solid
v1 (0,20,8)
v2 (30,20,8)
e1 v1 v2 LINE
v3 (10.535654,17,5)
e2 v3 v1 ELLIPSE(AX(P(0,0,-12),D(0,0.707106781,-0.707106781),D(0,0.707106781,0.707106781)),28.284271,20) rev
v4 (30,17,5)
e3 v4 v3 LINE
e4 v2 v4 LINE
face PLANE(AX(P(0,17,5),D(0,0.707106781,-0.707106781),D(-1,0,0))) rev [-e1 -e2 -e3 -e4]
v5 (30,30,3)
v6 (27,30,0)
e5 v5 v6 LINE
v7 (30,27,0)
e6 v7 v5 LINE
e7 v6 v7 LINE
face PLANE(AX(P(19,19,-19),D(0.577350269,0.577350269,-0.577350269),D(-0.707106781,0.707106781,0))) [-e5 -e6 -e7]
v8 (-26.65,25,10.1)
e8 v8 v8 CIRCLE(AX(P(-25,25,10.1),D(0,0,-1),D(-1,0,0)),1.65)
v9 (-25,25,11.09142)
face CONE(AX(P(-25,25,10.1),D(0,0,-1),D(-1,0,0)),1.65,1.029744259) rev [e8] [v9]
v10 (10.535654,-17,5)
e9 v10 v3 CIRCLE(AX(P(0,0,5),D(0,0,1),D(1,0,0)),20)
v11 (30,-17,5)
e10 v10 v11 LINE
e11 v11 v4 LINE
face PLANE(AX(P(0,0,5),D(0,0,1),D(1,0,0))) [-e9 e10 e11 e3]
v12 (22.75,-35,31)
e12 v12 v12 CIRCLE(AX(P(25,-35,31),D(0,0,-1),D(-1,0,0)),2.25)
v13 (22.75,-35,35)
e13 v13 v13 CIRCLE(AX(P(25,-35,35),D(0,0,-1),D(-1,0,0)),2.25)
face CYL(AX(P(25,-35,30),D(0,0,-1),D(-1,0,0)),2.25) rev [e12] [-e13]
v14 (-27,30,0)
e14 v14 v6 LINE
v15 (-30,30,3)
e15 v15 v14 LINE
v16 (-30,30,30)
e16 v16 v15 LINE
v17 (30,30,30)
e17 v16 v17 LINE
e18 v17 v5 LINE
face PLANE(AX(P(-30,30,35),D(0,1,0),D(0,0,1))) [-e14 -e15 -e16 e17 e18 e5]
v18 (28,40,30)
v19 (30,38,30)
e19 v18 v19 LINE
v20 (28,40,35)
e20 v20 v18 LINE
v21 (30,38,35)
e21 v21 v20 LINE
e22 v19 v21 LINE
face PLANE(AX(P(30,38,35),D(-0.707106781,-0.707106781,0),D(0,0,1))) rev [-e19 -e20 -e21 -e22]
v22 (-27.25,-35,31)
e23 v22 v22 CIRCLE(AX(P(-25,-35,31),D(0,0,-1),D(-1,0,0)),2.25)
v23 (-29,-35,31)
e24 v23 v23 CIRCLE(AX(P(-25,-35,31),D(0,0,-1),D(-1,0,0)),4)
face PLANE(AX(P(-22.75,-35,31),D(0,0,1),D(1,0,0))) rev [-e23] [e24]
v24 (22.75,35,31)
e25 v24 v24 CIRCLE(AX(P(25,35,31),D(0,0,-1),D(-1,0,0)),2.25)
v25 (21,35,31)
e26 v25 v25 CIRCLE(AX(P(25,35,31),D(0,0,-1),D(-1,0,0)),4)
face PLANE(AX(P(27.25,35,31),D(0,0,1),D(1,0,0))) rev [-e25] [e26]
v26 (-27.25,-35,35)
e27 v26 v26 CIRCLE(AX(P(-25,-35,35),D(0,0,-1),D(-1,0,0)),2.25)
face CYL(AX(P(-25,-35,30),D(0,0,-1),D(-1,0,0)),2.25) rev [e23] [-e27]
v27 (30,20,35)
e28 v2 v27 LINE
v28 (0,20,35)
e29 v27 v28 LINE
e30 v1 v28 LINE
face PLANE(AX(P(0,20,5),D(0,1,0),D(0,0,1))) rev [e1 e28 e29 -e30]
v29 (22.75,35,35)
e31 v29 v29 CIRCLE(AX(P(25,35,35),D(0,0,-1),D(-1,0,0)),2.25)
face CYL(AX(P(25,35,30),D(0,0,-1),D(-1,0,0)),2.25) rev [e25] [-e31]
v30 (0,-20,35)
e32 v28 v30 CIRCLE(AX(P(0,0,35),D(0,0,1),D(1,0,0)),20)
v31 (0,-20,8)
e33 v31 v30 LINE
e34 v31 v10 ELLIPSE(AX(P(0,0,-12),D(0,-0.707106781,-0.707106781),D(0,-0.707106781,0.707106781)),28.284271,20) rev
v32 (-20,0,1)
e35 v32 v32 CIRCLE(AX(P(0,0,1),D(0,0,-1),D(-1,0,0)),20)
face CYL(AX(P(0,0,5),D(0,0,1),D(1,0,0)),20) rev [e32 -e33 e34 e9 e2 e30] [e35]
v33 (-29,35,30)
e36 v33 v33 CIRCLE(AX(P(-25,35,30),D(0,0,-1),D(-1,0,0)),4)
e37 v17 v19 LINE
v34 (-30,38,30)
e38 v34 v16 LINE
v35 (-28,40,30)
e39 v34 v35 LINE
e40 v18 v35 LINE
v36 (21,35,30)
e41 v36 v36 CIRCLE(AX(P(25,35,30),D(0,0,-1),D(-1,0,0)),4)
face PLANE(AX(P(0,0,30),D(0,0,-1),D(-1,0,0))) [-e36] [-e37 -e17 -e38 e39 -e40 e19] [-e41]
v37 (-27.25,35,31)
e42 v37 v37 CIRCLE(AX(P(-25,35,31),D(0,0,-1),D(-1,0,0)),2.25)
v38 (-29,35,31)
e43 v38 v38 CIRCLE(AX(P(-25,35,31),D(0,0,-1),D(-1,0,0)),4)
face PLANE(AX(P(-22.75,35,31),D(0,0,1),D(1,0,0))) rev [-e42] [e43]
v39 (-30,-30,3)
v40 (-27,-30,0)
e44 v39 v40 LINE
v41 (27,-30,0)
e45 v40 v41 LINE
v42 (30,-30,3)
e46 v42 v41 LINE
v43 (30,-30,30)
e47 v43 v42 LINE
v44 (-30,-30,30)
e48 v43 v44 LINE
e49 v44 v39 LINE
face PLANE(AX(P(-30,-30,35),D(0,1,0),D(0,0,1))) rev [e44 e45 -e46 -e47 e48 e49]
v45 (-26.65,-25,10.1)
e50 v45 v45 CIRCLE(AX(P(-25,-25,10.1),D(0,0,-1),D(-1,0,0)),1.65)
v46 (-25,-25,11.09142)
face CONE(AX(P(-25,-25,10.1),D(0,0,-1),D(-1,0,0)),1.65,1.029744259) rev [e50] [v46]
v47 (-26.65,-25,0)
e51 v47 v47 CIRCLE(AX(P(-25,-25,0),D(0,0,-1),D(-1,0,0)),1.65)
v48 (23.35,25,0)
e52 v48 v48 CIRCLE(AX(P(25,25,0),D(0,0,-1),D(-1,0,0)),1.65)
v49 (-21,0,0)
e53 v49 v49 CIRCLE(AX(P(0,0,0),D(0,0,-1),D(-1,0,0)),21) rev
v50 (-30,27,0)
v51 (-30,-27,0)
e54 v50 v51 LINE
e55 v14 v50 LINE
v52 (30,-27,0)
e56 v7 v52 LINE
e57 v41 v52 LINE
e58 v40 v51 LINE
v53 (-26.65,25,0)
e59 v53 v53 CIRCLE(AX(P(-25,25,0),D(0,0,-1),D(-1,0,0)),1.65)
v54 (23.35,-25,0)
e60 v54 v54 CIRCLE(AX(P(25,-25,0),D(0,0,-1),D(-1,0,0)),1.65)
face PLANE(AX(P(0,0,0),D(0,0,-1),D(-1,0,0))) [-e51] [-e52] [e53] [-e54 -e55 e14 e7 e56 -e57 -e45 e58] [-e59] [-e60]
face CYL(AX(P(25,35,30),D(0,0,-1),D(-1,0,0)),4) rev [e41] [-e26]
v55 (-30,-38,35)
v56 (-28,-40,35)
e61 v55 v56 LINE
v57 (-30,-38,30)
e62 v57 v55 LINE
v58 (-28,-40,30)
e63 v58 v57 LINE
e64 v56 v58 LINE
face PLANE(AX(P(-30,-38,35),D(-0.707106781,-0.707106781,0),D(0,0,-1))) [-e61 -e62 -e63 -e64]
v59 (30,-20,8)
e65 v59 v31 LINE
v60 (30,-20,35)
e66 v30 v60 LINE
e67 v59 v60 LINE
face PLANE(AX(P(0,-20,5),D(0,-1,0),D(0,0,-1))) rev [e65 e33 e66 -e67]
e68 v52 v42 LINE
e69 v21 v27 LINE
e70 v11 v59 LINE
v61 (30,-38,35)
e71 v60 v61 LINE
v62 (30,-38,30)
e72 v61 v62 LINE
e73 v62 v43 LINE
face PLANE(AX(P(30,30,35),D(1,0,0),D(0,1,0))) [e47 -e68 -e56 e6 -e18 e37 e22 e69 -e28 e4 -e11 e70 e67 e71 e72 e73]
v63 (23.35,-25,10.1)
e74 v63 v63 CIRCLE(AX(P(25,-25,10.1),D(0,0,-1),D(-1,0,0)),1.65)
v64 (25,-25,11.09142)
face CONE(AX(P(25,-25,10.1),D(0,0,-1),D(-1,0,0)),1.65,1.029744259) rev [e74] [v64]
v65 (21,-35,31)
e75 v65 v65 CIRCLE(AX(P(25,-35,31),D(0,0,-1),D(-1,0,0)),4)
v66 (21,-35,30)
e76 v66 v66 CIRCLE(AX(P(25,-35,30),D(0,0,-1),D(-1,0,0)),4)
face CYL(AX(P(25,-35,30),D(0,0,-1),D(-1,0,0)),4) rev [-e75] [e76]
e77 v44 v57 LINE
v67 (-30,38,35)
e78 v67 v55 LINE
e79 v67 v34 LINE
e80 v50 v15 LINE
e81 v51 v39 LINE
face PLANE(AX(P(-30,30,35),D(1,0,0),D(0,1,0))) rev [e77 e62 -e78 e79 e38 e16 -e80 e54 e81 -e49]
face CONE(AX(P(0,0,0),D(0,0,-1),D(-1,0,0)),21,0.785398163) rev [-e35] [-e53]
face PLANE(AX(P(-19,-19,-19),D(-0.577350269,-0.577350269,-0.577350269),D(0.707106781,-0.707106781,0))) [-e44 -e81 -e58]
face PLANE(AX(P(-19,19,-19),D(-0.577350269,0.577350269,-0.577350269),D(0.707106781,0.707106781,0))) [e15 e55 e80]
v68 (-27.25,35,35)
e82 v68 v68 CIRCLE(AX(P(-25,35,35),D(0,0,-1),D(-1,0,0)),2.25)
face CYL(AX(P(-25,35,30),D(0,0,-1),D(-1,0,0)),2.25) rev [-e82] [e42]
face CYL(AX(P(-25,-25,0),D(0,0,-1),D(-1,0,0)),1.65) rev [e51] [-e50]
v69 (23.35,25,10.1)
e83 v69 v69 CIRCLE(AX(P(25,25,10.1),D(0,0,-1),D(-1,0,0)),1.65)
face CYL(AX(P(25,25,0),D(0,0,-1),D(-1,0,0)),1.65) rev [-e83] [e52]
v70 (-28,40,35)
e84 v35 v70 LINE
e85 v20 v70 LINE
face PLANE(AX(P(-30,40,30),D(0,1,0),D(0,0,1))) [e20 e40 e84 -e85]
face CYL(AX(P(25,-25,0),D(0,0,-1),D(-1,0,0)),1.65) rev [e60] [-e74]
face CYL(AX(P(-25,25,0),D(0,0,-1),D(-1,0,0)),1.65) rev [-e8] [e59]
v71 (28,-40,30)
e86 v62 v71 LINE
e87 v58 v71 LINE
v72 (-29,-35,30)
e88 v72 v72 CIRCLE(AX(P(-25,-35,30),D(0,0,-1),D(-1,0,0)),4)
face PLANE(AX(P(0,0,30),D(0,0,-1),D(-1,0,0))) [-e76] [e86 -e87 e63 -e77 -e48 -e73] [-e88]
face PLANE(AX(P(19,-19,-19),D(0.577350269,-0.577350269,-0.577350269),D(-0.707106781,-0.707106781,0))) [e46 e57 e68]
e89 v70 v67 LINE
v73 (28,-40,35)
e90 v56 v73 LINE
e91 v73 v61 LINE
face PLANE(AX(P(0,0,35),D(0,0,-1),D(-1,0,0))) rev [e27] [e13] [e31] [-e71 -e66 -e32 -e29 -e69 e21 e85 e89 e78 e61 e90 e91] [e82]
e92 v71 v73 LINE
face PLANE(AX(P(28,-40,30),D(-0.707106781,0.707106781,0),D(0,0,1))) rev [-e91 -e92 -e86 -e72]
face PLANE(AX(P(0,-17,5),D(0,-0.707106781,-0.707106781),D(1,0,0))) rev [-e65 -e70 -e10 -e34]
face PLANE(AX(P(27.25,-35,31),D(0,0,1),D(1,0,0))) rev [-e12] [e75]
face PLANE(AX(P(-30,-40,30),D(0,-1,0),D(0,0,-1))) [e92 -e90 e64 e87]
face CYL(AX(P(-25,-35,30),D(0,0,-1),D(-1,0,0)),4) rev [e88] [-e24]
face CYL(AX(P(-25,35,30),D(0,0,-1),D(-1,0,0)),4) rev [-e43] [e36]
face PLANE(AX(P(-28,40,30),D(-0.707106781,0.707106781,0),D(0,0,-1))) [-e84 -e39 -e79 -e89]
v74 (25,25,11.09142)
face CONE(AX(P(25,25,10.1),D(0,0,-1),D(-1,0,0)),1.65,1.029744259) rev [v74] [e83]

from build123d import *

# Parameters (mm, degrees)
BOSS_EXTRUDE1_DEPTH                                  = 35
CUT_EXTRUDE1_DEPTH                                   = 30
SKETCH3_R                                            = 20.000000000000007
CUT_EXTRUDE2_DEPTH                                   = 52.96152422706633
M4_TAPPED_HOLE1_D                                    = 3.3
M4_TAPPED_HOLE1_DEPTH                                = 10.1
M4_TAPPED_HOLE1_TIP                                  = 0.9914200213954745
BOSS_EXTRUDE2_DEPTH                                  = 5
CBORE_FOR_M4_HEXAGON_SOCKET_HEAD_CAP_SCR_D           = 4.5
CBORE_FOR_M4_HEXAGON_SOCKET_HEAD_CAP_SCR_CBORE_D     = 8
CBORE_FOR_M4_HEXAGON_SOCKET_HEAD_CAP_SCR_CBORE_DEPTH = 1
CHAMFER1_SIZE                                        = 2
CHAMFER2_START                                       = 32.908965344
CHAMFER2_OUTLINE_W                                   = 7.000000000000002
CHAMFER2_OUTLINE_H                                   = 7.0000000000000036
CHAMFER2_DEPTH                                       = 3.091034656
MIRROR1_START                                        = 32.908965344
MIRROR1_AT_THE_SECOND_PLANE_COPY_1_SKETC_W           = 7.000000000000002
MIRROR1_AT_THE_SECOND_PLANE_COPY_1_SKETC_H           = 7.0000000000000036
MIRROR1_AT_THE_SECOND_PLANE_COPY_1_DEPTH             = 3.091034656
CHAMFER3_SIZE                                        = 1
CHAMFER4_SIZE                                        = 3


with BuildPart() as part:
    # Sketch1 → Boss-Extrude1 (new body)
    with BuildSketch(Plane.XY):
        Polygon((-29.999999999999993, 30), (30, 30), (30.000000000000014, -30), (-29.999999999999986, -30), align=None)
    extrude(amount=BOSS_EXTRUDE1_DEPTH)

    # Sketch2 → Cut-Extrude1 (cut)
    with BuildSketch(Plane.XY.offset(35)):
        with BuildLine():
            Line((0, 20.000000000000004), (30.00000000000001, 20.000000000000004))
            Line((30.00000000000001, 20.000000000000004), (30, -20.000000000000004))
            Line((30, -20.000000000000004), (0, -20.000000000000004))
            ThreePointArc((0, -20.000000000000004), (-20.000000000000004, 2.45e-15), (0, 20.000000000000004))
        make_face()
    extrude(amount=-CUT_EXTRUDE1_DEPTH, mode=Mode.SUBTRACT)

    # Sketch3 → Cut-Extrude2 (cut, through all)
    with BuildSketch(Plane.XY.offset(5.000000000000004)):
        Circle(SKETCH3_R)
    extrude(amount=-CUT_EXTRUDE2_DEPTH, mode=Mode.SUBTRACT)

    # M4 Tapped Hole1
    with Locations(Plane(origin=(0, 0, 0), x_dir=(-1, 0, 0), z_dir=(0, 0, -1))):
        with Locations((-25, 25), (25, 25), (25, -25), (-25, -25)):
            Hole(M4_TAPPED_HOLE1_D / 2, depth=M4_TAPPED_HOLE1_DEPTH)
            with Locations((0, 0, -(M4_TAPPED_HOLE1_DEPTH + M4_TAPPED_HOLE1_TIP / 2))):  # 118° drill point
                Cone(0, M4_TAPPED_HOLE1_D / 2, M4_TAPPED_HOLE1_TIP, mode=Mode.SUBTRACT)

    # Sketch7 → Boss-Extrude2 (add)
    with BuildSketch(Plane.XY.offset(35)):
        Polygon((-29.999999999999993, 30), (30, 29.999999999999993), (30, 40), (-29.999999999999993, 40), align=None)
        Polygon((30, -29.999999999999993), (30, -40), (-29.999999999999993, -40), (-29.999999999999993, -30), align=None)
    extrude(amount=-BOSS_EXTRUDE2_DEPTH)

    # CBORE for M4 Hexagon socket head cap screws1 (through all)
    with Locations(Plane(origin=(0, 0, 30.000000000000004), x_dir=(-1, 0, 0), z_dir=(0, 0, -1))):
        with Locations((-25, 35), (-25, -35), (25, -35), (25, 35)):
            CounterBoreHole(CBORE_FOR_M4_HEXAGON_SOCKET_HEAD_CAP_SCR_D / 2, CBORE_FOR_M4_HEXAGON_SOCKET_HEAD_CAP_SCR_CBORE_D / 2, CBORE_FOR_M4_HEXAGON_SOCKET_HEAD_CAP_SCR_CBORE_DEPTH)

    # Chamfer1
    chamfer1_edges = [part.edges().sort_by_distance(p)[0] for p in [
        (-29.999999999999993, 40, 32.5),
        (30, 40, 32.5),
        (30, -40, 32.5),
        (-29.999999999999993, -40, 32.5),
    ]]
    chamfer(chamfer1_edges, length=CHAMFER1_SIZE)

    # Chamfer2: read off the stored shape, not the designer's step
    # Chamfer2 outline → Chamfer2 (cut)
    with BuildSketch(Plane(origin=(0, 0, 0), x_dir=(0.8164965809277258, -0.40824829046386313, 0.40824829046386313), z_dir=(0.5773502691896258, 0.5773502691896258, -0.5773502691896258)).offset(CHAMFER2_START)):
        with Locations((11.5, -21.5)):
            Rectangle(CHAMFER2_OUTLINE_W, CHAMFER2_OUTLINE_H)
    chamfer2 = extrude(amount=CHAMFER2_DEPTH, mode=Mode.SUBTRACT)

    # Mirror1: Chamfer2 across plane
    add(chamfer2.mirror(Plane(origin=(0, 0, 0), x_dir=(0, 0, 1), z_dir=(1, 0, 0))), mode=Mode.SUBTRACT)

    # Mirror1 at the second plane: Chamfer2 across plane
    add(chamfer2.mirror(Plane.ZX), mode=Mode.SUBTRACT)

    # Mirror1 at the second plane copy 1 sketc → Mirror1 at the second plane copy 1 (cut)
    with BuildSketch(Plane(origin=(0, 0, 0), x_dir=(-0.8164965809277258, 0.40824829046386313, 0.40824829046386313), z_dir=(-0.5773502691896258, -0.5773502691896258, -0.5773502691896258)).offset(MIRROR1_START)):
        with Locations((11.5, -21.5)):
            Rectangle(MIRROR1_AT_THE_SECOND_PLANE_COPY_1_SKETC_W, MIRROR1_AT_THE_SECOND_PLANE_COPY_1_SKETC_H)
    extrude(amount=MIRROR1_AT_THE_SECOND_PLANE_COPY_1_DEPTH, mode=Mode.SUBTRACT)

    # Chamfer3
    chamfer3_edges = [part.edges().sort_by_distance(p)[0] for p in [
        (-20.000000000000007, 2.45e-15, 0),
    ]]
    chamfer(chamfer3_edges, length=CHAMFER3_SIZE)

    # Chamfer4
    # the kernel refuses this chamfer: 3 mm, written as the material it adds along each edge
    with BuildSketch(Plane(origin=(-13.115583238626146, 20.000000000000004, 5), x_dir=(0, -1, 0), z_dir=(1, 0, 0))) as chamfer4_piece_1_section:
        Polygon((CHAMFER4_SIZE, 0), (0, -CHAMFER4_SIZE), (0, 0), align=None)
    chamfer4_piece_1 = extrude(amount=43.11558323862616, mode=Mode.PRIVATE)
    chamfer4_piece_1 = chamfer4_piece_1 - Plane(origin=(0, 0, 5), x_dir=(1, 0, 0), z_dir=(0, 0, 1)) * Cylinder(20.000000000000007, 99, mode=Mode.PRIVATE)
    add(chamfer4_piece_1)
    with BuildSketch(Plane(origin=(30, -20.000000000000004, 5), x_dir=(0, 0, 1), z_dir=(-1, 0, 0))) as chamfer4_piece_2_section:
        Polygon((CHAMFER4_SIZE, 0), (0, CHAMFER4_SIZE), (0, 0), align=None)
    chamfer4_piece_2 = extrude(amount=43.11558323862615, mode=Mode.PRIVATE)
    chamfer4_piece_2 = chamfer4_piece_2 - Plane(origin=(0, 0, 5), x_dir=(1, 0, 0), z_dir=(0, 0, 1)) * Cylinder(20.000000000000007, 99, mode=Mode.PRIVATE)
    add(chamfer4_piece_2)


solid = part.part
